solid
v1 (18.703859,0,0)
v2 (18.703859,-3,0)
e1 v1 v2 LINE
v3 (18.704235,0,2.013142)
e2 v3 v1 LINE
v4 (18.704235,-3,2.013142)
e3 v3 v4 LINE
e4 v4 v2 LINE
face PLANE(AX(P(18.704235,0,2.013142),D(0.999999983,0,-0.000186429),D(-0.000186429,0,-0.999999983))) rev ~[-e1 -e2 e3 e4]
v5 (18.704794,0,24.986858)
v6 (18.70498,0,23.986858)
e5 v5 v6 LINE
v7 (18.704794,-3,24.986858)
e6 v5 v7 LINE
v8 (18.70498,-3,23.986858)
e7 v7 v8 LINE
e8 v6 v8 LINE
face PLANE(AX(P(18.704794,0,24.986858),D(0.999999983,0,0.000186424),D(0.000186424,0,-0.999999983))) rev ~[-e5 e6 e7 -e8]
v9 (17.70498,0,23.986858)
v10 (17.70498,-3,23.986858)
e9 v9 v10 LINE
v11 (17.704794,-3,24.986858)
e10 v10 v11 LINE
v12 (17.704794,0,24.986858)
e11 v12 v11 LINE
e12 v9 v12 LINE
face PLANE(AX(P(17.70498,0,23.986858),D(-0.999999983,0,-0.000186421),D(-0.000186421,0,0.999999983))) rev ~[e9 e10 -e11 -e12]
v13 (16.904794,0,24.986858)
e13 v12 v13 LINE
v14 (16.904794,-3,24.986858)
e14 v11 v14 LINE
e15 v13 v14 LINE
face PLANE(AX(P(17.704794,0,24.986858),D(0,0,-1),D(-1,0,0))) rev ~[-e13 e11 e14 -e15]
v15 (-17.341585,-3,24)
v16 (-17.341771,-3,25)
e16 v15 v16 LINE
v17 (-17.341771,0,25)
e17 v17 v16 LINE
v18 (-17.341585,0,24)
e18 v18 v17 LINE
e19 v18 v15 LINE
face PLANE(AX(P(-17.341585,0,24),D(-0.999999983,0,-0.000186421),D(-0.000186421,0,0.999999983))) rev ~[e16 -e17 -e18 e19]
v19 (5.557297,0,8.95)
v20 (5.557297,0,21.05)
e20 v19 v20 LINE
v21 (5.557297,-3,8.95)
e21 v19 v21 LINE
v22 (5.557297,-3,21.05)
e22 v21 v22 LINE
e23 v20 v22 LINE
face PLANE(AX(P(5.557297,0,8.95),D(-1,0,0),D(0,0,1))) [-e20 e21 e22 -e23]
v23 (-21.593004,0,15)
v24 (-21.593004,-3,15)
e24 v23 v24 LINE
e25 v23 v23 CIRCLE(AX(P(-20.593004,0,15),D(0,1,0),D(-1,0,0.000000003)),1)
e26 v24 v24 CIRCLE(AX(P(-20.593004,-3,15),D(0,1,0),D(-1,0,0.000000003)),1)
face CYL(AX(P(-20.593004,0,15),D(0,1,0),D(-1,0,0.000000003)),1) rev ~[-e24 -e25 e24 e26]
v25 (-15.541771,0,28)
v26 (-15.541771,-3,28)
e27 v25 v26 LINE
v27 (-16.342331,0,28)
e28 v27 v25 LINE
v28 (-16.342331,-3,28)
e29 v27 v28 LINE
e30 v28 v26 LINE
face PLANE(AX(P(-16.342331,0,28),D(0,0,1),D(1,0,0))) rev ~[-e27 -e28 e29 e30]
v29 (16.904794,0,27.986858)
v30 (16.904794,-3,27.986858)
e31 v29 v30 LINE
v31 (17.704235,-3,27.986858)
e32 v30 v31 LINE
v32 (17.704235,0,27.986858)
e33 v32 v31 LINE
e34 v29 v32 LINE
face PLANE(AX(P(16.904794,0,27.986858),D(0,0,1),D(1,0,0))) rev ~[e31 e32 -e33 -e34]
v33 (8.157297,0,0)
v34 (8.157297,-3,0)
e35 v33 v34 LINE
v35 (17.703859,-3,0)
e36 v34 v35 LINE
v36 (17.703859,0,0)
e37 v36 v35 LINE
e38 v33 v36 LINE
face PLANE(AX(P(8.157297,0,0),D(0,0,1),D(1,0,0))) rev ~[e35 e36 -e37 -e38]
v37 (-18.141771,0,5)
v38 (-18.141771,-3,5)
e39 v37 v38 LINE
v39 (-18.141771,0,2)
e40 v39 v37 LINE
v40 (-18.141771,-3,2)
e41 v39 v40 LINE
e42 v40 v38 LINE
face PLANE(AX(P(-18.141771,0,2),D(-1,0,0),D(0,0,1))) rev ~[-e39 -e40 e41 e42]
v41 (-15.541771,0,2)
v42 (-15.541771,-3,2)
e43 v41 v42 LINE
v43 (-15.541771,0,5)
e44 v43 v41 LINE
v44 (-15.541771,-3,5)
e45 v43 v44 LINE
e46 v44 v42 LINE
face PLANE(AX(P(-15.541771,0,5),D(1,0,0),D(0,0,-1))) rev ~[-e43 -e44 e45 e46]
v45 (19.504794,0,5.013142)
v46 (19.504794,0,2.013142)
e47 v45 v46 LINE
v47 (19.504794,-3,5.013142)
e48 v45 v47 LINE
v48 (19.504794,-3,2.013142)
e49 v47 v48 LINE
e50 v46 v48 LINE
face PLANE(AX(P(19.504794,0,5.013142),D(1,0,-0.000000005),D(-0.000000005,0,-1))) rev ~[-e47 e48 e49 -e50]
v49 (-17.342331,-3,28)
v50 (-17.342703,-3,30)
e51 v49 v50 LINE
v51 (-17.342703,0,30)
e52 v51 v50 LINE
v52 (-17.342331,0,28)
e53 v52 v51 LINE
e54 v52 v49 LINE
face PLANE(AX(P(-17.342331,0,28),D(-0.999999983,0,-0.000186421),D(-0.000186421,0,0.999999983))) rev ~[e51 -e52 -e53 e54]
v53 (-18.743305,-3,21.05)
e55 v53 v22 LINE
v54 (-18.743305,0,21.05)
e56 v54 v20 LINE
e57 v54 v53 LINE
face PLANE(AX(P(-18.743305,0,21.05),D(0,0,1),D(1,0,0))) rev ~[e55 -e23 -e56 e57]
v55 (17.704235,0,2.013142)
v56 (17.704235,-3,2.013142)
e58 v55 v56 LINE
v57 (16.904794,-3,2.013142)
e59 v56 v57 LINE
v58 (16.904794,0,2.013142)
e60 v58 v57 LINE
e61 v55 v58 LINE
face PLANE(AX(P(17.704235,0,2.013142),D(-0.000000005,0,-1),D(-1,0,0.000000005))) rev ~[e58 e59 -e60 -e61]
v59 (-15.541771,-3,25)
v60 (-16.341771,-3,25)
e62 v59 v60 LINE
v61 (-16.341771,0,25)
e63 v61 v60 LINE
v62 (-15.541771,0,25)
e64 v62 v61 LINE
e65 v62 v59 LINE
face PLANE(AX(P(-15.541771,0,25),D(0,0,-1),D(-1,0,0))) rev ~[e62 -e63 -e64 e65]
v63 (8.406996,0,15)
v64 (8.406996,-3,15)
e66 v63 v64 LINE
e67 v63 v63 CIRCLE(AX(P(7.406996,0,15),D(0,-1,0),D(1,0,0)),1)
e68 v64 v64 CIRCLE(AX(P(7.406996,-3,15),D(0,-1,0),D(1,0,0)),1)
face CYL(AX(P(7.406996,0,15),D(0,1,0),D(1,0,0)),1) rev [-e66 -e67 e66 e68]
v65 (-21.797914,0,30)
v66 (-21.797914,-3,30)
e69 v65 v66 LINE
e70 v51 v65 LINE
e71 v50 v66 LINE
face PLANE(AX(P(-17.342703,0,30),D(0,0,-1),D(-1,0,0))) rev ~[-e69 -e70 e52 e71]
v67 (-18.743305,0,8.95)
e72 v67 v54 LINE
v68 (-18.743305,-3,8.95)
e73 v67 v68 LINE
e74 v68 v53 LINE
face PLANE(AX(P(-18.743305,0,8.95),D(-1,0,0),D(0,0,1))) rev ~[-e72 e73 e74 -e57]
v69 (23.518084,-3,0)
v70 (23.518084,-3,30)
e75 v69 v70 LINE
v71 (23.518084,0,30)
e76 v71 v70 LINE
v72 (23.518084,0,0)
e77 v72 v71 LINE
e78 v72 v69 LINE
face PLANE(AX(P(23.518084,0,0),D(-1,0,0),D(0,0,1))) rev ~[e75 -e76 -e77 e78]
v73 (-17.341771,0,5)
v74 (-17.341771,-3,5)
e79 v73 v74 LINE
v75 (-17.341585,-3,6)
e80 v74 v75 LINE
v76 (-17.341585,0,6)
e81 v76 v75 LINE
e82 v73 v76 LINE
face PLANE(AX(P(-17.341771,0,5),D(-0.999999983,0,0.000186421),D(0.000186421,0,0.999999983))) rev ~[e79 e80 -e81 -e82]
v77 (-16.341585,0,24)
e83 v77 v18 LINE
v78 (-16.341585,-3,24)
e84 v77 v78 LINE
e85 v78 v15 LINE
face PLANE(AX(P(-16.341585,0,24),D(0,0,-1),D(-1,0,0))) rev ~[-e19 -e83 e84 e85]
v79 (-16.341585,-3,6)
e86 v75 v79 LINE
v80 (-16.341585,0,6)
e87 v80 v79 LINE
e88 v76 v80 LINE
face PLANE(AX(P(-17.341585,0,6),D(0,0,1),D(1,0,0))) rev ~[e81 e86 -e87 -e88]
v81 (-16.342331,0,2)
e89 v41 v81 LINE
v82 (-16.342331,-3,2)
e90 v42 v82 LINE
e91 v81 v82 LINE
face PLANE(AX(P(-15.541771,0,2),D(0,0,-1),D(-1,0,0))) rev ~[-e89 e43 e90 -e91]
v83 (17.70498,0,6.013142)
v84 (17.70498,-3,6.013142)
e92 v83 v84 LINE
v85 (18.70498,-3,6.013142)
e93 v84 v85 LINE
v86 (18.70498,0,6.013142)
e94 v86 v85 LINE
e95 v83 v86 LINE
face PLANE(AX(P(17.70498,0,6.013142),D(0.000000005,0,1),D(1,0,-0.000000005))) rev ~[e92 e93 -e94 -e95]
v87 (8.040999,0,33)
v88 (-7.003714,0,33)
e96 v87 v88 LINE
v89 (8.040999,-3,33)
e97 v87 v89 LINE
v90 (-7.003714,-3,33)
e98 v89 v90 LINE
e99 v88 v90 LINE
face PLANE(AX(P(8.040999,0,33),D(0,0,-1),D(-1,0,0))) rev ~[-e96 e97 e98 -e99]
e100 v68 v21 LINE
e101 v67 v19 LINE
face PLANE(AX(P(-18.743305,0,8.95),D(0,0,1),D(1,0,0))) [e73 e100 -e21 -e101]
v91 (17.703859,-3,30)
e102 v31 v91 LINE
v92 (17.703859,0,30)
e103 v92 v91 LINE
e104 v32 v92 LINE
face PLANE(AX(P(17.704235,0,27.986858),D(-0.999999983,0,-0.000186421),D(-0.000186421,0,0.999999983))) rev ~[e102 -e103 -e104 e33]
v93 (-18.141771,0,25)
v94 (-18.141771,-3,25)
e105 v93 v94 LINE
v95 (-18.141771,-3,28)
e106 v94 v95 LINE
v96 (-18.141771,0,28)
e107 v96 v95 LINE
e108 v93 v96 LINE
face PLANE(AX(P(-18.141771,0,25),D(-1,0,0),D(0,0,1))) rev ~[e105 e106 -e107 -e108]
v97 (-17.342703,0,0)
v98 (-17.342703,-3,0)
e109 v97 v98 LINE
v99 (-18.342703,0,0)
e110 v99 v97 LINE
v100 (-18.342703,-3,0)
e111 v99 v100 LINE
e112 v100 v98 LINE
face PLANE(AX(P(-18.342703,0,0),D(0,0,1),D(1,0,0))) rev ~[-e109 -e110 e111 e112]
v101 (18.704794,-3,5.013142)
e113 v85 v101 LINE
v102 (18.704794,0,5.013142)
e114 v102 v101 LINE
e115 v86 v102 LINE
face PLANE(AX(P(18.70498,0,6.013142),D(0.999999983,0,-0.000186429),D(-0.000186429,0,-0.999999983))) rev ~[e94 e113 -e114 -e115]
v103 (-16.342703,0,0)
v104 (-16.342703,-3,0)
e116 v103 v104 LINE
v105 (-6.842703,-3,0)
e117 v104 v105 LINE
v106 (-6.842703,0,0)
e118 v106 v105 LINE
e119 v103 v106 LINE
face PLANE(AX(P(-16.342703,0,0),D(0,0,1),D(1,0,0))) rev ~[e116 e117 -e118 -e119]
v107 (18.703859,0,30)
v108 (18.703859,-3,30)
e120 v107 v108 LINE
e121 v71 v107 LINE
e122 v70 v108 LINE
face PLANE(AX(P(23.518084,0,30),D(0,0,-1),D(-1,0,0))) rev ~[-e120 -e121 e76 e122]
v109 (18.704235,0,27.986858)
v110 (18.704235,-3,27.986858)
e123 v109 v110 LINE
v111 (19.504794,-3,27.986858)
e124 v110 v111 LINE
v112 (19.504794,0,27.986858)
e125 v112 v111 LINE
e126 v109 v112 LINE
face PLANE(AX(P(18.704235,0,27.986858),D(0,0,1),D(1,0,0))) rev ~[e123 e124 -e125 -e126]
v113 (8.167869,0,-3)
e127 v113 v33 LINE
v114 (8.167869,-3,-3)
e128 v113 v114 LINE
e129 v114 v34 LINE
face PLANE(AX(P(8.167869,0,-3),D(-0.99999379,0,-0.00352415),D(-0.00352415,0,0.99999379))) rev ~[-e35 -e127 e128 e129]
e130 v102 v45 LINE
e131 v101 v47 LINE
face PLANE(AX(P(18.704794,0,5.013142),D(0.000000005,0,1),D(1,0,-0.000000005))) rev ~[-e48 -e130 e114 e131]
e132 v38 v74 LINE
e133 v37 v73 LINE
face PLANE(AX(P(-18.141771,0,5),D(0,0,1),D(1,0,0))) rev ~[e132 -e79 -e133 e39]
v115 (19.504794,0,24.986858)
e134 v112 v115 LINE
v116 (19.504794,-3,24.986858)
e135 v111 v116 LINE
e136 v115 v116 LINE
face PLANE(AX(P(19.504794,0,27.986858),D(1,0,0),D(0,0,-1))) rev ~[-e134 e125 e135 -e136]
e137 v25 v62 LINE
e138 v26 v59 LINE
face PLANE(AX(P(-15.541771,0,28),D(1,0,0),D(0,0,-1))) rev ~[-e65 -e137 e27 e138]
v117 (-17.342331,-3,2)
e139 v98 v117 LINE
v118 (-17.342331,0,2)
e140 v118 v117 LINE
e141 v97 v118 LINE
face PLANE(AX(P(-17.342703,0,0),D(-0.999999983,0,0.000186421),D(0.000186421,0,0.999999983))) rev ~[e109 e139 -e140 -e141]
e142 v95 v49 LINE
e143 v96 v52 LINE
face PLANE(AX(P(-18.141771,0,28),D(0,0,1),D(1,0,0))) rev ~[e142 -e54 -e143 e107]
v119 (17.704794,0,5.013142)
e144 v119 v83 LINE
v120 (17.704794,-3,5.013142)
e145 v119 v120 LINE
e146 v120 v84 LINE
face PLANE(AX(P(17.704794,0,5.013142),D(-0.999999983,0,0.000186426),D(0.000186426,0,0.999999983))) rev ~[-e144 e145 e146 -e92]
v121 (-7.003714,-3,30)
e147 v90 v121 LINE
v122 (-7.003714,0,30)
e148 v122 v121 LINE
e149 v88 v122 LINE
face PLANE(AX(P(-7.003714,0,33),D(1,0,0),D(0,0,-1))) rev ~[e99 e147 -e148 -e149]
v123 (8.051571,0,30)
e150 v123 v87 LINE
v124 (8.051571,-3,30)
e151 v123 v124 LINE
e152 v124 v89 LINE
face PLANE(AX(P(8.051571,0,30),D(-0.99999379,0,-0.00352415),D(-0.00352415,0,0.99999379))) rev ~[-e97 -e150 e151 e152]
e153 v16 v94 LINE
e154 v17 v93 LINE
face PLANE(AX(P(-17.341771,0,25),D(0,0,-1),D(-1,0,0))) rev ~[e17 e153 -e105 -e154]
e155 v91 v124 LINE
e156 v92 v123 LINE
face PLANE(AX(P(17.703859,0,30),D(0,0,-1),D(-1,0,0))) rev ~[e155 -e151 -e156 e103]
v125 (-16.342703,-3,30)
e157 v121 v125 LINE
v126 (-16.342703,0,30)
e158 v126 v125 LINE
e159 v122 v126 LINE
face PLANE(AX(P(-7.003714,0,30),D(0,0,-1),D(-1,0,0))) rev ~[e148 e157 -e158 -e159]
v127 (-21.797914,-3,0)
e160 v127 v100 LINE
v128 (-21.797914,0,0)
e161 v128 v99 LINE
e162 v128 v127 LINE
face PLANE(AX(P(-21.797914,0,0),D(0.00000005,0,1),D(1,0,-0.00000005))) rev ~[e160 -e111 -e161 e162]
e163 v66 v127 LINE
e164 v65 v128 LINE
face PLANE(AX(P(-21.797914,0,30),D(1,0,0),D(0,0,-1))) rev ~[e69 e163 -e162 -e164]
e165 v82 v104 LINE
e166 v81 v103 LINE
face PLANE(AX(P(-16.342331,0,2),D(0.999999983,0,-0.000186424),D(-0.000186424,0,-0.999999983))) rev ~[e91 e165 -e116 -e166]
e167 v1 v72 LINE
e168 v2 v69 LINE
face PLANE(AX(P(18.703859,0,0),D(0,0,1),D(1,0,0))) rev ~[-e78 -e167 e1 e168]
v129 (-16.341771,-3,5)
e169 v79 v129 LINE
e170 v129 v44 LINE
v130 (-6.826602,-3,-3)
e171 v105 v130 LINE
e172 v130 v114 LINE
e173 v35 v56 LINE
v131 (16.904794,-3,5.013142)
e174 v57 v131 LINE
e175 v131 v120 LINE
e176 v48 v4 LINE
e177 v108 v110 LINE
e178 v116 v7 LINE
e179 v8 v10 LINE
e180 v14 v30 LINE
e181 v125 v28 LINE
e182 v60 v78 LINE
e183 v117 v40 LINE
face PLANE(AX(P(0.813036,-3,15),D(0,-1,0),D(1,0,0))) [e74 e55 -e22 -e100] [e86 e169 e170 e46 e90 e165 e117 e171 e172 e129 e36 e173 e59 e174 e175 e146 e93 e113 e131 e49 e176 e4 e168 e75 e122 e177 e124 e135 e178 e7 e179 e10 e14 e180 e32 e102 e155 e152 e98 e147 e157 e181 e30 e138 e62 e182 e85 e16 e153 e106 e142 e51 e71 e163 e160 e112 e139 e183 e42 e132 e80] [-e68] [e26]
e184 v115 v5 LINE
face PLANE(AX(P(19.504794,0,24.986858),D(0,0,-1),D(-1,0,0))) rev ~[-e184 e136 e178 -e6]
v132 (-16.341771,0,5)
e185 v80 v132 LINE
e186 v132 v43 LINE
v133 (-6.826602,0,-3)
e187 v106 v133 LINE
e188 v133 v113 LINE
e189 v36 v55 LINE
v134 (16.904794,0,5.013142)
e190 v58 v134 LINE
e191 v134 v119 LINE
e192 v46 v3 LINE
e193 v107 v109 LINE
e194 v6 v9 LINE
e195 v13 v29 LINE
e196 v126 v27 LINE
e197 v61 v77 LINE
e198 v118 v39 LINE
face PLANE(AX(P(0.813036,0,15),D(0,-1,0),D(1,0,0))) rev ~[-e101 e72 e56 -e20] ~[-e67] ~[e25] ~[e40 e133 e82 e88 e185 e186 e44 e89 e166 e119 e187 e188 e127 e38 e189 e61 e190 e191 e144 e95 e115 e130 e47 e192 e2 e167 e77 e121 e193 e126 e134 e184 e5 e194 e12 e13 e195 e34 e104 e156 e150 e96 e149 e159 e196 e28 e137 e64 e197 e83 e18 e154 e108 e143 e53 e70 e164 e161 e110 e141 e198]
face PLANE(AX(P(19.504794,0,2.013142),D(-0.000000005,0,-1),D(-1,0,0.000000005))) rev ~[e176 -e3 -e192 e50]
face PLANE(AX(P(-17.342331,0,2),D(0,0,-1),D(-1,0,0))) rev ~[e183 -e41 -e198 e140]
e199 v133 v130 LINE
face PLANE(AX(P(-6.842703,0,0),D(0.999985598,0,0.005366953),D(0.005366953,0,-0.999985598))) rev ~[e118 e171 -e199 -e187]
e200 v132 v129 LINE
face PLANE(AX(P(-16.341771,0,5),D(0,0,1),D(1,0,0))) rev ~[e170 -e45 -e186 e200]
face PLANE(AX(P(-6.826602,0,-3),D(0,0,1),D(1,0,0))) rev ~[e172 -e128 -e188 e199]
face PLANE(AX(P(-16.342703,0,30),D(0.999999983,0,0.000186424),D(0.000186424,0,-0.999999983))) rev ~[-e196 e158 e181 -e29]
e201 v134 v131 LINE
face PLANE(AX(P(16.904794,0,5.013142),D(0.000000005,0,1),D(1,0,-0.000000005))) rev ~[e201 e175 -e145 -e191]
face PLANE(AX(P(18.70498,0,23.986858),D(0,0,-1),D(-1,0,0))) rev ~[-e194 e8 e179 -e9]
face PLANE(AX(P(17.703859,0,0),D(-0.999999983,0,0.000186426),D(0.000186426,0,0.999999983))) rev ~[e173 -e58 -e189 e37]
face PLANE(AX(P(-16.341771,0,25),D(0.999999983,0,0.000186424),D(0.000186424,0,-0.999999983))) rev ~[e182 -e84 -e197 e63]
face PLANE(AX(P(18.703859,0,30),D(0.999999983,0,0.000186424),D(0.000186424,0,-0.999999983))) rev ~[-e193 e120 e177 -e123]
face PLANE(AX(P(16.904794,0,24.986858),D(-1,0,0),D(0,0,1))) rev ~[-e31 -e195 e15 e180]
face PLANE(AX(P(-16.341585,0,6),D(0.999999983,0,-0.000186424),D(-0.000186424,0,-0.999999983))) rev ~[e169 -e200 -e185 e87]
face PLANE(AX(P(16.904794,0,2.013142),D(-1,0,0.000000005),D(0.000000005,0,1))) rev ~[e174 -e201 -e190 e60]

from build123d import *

# Parameters (mm, degrees)
F3_W     = 24.3006017764
F3_H     = 12.100000065
F3_R     = 1
F4_DEPTH = 3


# Not quite as in the source:
# - ends of sketch curves that miss each other by under 0.0002 mm in the source are joined


with BuildPart() as f4:
    # F3 (on Front) → F4 (new body)
    with BuildSketch(Plane.XZ):
        Polygon((-18.3427034128, 0), (-17.3427034128, 0), (-17.3423305717, 1.9999998262), (-18.1417713099, 1.9999998262), (-18.1417713099, 4.9999998262), (-17.3417713099, 4.9999998262), (-17.3415848893, 5.9999998262), (-16.3415848684, 5.9999998262), (-16.3417712925, 4.9999998262), (-15.5417712925, 4.9999998262), (-15.5417712925, 1.9999998262), (-16.3423305647, 1.9999998262), (-16.3427034128, 0), (-15.3427034128, 0), (-6.8427034128, 0), (8.1310835591, 0), (8.1572965872, 0), (16.6572965872, 0), (17.7038592511, 0), (17.704234553, 2.0131421474), (16.9047938148, 2.0131421517), (16.9047938308, 5.0131421517), (17.7047938308, 5.0131421474), (17.7049802567, 6.0131421474), (18.7049802776, 6.0131421421), (18.7047938482, 5.0131421421), (19.5047938482, 5.0131421378), (19.5047938321, 2.0131421378), (18.7042345599, 2.0131421421), (18.703859251, 0), (19.6572965872, 0), (23.5180836171, 0), (23.5180836171, 30), (18.7038593313, 30), (18.7042346294, 27.9868579887), (19.5047939016, 27.9868579887), (19.5047939016, 24.9868579887), (18.7047939016, 24.9868579887), (18.7049803257, 23.9868579887), (17.7049803048, 23.9868579887), (17.7047938842, 24.9868579887), (16.9047938842, 24.9868579887), (16.9047938842, 27.9868579887), (17.7042346225, 27.9868579887), (17.7038593313, 30), (8.0515714362, 30), (0, 30), (-7.0037143305, 30), (-16.3427034128, 30), (-16.3423305647, 28.0000001738), (-15.5417712925, 28.0000001738), (-15.5417712925, 25.0000001738), (-16.3417712925, 25.0000001738), (-16.3415848684, 24.0000001738), (-17.3415848893, 24.0000001738), (-17.3417713099, 25.0000001738), (-18.1417713099, 25.0000001738), (-18.1417713099, 28.0000001738), (-17.3423305717, 28.0000001738), (-17.3427034128, 30), (-21.7979144805, 30), (-21.7979144805, 28.0000001738), (-21.7979144805, 25.0000001738), (-21.7979144805, 24.0000001738), (-21.7979144805, 15.0000001738), (-21.7979144805, 1.738e-07), align=None)
        with BuildLine():
            ThreePointArc((-19.593004301, 15.0000001705), (-20.5930043024, 14.0000001705), (-21.593004301, 15.0000001732))
            ThreePointArc((-21.593004301, 15.0000001732), (-20.5930042997, 16.0000001705), (-19.593004301, 15.0000001705))
        make_face(mode=Mode.SUBTRACT)
        with Locations((-6.593004301, 15.0000001331)):
            Rectangle(F3_W, F3_H, mode=Mode.SUBTRACT)
        with Locations((7.406995699, 15.0000000956)):
            Circle(F3_R, mode=Mode.SUBTRACT)
        Polygon((-7.0037143305, 33), (-7.0037143305, 30), (0, 30), (8.0515714362, 30), (8.0409989211, 33), align=None)
        Polygon((8.1310835591, 0), (-6.8427034128, 0), (-6.826602321, -3), (0, -3), (8.1678691023, -3), (8.1572965872, 0), align=None)
    extrude(amount=F4_DEPTH)


solid = f4.part
